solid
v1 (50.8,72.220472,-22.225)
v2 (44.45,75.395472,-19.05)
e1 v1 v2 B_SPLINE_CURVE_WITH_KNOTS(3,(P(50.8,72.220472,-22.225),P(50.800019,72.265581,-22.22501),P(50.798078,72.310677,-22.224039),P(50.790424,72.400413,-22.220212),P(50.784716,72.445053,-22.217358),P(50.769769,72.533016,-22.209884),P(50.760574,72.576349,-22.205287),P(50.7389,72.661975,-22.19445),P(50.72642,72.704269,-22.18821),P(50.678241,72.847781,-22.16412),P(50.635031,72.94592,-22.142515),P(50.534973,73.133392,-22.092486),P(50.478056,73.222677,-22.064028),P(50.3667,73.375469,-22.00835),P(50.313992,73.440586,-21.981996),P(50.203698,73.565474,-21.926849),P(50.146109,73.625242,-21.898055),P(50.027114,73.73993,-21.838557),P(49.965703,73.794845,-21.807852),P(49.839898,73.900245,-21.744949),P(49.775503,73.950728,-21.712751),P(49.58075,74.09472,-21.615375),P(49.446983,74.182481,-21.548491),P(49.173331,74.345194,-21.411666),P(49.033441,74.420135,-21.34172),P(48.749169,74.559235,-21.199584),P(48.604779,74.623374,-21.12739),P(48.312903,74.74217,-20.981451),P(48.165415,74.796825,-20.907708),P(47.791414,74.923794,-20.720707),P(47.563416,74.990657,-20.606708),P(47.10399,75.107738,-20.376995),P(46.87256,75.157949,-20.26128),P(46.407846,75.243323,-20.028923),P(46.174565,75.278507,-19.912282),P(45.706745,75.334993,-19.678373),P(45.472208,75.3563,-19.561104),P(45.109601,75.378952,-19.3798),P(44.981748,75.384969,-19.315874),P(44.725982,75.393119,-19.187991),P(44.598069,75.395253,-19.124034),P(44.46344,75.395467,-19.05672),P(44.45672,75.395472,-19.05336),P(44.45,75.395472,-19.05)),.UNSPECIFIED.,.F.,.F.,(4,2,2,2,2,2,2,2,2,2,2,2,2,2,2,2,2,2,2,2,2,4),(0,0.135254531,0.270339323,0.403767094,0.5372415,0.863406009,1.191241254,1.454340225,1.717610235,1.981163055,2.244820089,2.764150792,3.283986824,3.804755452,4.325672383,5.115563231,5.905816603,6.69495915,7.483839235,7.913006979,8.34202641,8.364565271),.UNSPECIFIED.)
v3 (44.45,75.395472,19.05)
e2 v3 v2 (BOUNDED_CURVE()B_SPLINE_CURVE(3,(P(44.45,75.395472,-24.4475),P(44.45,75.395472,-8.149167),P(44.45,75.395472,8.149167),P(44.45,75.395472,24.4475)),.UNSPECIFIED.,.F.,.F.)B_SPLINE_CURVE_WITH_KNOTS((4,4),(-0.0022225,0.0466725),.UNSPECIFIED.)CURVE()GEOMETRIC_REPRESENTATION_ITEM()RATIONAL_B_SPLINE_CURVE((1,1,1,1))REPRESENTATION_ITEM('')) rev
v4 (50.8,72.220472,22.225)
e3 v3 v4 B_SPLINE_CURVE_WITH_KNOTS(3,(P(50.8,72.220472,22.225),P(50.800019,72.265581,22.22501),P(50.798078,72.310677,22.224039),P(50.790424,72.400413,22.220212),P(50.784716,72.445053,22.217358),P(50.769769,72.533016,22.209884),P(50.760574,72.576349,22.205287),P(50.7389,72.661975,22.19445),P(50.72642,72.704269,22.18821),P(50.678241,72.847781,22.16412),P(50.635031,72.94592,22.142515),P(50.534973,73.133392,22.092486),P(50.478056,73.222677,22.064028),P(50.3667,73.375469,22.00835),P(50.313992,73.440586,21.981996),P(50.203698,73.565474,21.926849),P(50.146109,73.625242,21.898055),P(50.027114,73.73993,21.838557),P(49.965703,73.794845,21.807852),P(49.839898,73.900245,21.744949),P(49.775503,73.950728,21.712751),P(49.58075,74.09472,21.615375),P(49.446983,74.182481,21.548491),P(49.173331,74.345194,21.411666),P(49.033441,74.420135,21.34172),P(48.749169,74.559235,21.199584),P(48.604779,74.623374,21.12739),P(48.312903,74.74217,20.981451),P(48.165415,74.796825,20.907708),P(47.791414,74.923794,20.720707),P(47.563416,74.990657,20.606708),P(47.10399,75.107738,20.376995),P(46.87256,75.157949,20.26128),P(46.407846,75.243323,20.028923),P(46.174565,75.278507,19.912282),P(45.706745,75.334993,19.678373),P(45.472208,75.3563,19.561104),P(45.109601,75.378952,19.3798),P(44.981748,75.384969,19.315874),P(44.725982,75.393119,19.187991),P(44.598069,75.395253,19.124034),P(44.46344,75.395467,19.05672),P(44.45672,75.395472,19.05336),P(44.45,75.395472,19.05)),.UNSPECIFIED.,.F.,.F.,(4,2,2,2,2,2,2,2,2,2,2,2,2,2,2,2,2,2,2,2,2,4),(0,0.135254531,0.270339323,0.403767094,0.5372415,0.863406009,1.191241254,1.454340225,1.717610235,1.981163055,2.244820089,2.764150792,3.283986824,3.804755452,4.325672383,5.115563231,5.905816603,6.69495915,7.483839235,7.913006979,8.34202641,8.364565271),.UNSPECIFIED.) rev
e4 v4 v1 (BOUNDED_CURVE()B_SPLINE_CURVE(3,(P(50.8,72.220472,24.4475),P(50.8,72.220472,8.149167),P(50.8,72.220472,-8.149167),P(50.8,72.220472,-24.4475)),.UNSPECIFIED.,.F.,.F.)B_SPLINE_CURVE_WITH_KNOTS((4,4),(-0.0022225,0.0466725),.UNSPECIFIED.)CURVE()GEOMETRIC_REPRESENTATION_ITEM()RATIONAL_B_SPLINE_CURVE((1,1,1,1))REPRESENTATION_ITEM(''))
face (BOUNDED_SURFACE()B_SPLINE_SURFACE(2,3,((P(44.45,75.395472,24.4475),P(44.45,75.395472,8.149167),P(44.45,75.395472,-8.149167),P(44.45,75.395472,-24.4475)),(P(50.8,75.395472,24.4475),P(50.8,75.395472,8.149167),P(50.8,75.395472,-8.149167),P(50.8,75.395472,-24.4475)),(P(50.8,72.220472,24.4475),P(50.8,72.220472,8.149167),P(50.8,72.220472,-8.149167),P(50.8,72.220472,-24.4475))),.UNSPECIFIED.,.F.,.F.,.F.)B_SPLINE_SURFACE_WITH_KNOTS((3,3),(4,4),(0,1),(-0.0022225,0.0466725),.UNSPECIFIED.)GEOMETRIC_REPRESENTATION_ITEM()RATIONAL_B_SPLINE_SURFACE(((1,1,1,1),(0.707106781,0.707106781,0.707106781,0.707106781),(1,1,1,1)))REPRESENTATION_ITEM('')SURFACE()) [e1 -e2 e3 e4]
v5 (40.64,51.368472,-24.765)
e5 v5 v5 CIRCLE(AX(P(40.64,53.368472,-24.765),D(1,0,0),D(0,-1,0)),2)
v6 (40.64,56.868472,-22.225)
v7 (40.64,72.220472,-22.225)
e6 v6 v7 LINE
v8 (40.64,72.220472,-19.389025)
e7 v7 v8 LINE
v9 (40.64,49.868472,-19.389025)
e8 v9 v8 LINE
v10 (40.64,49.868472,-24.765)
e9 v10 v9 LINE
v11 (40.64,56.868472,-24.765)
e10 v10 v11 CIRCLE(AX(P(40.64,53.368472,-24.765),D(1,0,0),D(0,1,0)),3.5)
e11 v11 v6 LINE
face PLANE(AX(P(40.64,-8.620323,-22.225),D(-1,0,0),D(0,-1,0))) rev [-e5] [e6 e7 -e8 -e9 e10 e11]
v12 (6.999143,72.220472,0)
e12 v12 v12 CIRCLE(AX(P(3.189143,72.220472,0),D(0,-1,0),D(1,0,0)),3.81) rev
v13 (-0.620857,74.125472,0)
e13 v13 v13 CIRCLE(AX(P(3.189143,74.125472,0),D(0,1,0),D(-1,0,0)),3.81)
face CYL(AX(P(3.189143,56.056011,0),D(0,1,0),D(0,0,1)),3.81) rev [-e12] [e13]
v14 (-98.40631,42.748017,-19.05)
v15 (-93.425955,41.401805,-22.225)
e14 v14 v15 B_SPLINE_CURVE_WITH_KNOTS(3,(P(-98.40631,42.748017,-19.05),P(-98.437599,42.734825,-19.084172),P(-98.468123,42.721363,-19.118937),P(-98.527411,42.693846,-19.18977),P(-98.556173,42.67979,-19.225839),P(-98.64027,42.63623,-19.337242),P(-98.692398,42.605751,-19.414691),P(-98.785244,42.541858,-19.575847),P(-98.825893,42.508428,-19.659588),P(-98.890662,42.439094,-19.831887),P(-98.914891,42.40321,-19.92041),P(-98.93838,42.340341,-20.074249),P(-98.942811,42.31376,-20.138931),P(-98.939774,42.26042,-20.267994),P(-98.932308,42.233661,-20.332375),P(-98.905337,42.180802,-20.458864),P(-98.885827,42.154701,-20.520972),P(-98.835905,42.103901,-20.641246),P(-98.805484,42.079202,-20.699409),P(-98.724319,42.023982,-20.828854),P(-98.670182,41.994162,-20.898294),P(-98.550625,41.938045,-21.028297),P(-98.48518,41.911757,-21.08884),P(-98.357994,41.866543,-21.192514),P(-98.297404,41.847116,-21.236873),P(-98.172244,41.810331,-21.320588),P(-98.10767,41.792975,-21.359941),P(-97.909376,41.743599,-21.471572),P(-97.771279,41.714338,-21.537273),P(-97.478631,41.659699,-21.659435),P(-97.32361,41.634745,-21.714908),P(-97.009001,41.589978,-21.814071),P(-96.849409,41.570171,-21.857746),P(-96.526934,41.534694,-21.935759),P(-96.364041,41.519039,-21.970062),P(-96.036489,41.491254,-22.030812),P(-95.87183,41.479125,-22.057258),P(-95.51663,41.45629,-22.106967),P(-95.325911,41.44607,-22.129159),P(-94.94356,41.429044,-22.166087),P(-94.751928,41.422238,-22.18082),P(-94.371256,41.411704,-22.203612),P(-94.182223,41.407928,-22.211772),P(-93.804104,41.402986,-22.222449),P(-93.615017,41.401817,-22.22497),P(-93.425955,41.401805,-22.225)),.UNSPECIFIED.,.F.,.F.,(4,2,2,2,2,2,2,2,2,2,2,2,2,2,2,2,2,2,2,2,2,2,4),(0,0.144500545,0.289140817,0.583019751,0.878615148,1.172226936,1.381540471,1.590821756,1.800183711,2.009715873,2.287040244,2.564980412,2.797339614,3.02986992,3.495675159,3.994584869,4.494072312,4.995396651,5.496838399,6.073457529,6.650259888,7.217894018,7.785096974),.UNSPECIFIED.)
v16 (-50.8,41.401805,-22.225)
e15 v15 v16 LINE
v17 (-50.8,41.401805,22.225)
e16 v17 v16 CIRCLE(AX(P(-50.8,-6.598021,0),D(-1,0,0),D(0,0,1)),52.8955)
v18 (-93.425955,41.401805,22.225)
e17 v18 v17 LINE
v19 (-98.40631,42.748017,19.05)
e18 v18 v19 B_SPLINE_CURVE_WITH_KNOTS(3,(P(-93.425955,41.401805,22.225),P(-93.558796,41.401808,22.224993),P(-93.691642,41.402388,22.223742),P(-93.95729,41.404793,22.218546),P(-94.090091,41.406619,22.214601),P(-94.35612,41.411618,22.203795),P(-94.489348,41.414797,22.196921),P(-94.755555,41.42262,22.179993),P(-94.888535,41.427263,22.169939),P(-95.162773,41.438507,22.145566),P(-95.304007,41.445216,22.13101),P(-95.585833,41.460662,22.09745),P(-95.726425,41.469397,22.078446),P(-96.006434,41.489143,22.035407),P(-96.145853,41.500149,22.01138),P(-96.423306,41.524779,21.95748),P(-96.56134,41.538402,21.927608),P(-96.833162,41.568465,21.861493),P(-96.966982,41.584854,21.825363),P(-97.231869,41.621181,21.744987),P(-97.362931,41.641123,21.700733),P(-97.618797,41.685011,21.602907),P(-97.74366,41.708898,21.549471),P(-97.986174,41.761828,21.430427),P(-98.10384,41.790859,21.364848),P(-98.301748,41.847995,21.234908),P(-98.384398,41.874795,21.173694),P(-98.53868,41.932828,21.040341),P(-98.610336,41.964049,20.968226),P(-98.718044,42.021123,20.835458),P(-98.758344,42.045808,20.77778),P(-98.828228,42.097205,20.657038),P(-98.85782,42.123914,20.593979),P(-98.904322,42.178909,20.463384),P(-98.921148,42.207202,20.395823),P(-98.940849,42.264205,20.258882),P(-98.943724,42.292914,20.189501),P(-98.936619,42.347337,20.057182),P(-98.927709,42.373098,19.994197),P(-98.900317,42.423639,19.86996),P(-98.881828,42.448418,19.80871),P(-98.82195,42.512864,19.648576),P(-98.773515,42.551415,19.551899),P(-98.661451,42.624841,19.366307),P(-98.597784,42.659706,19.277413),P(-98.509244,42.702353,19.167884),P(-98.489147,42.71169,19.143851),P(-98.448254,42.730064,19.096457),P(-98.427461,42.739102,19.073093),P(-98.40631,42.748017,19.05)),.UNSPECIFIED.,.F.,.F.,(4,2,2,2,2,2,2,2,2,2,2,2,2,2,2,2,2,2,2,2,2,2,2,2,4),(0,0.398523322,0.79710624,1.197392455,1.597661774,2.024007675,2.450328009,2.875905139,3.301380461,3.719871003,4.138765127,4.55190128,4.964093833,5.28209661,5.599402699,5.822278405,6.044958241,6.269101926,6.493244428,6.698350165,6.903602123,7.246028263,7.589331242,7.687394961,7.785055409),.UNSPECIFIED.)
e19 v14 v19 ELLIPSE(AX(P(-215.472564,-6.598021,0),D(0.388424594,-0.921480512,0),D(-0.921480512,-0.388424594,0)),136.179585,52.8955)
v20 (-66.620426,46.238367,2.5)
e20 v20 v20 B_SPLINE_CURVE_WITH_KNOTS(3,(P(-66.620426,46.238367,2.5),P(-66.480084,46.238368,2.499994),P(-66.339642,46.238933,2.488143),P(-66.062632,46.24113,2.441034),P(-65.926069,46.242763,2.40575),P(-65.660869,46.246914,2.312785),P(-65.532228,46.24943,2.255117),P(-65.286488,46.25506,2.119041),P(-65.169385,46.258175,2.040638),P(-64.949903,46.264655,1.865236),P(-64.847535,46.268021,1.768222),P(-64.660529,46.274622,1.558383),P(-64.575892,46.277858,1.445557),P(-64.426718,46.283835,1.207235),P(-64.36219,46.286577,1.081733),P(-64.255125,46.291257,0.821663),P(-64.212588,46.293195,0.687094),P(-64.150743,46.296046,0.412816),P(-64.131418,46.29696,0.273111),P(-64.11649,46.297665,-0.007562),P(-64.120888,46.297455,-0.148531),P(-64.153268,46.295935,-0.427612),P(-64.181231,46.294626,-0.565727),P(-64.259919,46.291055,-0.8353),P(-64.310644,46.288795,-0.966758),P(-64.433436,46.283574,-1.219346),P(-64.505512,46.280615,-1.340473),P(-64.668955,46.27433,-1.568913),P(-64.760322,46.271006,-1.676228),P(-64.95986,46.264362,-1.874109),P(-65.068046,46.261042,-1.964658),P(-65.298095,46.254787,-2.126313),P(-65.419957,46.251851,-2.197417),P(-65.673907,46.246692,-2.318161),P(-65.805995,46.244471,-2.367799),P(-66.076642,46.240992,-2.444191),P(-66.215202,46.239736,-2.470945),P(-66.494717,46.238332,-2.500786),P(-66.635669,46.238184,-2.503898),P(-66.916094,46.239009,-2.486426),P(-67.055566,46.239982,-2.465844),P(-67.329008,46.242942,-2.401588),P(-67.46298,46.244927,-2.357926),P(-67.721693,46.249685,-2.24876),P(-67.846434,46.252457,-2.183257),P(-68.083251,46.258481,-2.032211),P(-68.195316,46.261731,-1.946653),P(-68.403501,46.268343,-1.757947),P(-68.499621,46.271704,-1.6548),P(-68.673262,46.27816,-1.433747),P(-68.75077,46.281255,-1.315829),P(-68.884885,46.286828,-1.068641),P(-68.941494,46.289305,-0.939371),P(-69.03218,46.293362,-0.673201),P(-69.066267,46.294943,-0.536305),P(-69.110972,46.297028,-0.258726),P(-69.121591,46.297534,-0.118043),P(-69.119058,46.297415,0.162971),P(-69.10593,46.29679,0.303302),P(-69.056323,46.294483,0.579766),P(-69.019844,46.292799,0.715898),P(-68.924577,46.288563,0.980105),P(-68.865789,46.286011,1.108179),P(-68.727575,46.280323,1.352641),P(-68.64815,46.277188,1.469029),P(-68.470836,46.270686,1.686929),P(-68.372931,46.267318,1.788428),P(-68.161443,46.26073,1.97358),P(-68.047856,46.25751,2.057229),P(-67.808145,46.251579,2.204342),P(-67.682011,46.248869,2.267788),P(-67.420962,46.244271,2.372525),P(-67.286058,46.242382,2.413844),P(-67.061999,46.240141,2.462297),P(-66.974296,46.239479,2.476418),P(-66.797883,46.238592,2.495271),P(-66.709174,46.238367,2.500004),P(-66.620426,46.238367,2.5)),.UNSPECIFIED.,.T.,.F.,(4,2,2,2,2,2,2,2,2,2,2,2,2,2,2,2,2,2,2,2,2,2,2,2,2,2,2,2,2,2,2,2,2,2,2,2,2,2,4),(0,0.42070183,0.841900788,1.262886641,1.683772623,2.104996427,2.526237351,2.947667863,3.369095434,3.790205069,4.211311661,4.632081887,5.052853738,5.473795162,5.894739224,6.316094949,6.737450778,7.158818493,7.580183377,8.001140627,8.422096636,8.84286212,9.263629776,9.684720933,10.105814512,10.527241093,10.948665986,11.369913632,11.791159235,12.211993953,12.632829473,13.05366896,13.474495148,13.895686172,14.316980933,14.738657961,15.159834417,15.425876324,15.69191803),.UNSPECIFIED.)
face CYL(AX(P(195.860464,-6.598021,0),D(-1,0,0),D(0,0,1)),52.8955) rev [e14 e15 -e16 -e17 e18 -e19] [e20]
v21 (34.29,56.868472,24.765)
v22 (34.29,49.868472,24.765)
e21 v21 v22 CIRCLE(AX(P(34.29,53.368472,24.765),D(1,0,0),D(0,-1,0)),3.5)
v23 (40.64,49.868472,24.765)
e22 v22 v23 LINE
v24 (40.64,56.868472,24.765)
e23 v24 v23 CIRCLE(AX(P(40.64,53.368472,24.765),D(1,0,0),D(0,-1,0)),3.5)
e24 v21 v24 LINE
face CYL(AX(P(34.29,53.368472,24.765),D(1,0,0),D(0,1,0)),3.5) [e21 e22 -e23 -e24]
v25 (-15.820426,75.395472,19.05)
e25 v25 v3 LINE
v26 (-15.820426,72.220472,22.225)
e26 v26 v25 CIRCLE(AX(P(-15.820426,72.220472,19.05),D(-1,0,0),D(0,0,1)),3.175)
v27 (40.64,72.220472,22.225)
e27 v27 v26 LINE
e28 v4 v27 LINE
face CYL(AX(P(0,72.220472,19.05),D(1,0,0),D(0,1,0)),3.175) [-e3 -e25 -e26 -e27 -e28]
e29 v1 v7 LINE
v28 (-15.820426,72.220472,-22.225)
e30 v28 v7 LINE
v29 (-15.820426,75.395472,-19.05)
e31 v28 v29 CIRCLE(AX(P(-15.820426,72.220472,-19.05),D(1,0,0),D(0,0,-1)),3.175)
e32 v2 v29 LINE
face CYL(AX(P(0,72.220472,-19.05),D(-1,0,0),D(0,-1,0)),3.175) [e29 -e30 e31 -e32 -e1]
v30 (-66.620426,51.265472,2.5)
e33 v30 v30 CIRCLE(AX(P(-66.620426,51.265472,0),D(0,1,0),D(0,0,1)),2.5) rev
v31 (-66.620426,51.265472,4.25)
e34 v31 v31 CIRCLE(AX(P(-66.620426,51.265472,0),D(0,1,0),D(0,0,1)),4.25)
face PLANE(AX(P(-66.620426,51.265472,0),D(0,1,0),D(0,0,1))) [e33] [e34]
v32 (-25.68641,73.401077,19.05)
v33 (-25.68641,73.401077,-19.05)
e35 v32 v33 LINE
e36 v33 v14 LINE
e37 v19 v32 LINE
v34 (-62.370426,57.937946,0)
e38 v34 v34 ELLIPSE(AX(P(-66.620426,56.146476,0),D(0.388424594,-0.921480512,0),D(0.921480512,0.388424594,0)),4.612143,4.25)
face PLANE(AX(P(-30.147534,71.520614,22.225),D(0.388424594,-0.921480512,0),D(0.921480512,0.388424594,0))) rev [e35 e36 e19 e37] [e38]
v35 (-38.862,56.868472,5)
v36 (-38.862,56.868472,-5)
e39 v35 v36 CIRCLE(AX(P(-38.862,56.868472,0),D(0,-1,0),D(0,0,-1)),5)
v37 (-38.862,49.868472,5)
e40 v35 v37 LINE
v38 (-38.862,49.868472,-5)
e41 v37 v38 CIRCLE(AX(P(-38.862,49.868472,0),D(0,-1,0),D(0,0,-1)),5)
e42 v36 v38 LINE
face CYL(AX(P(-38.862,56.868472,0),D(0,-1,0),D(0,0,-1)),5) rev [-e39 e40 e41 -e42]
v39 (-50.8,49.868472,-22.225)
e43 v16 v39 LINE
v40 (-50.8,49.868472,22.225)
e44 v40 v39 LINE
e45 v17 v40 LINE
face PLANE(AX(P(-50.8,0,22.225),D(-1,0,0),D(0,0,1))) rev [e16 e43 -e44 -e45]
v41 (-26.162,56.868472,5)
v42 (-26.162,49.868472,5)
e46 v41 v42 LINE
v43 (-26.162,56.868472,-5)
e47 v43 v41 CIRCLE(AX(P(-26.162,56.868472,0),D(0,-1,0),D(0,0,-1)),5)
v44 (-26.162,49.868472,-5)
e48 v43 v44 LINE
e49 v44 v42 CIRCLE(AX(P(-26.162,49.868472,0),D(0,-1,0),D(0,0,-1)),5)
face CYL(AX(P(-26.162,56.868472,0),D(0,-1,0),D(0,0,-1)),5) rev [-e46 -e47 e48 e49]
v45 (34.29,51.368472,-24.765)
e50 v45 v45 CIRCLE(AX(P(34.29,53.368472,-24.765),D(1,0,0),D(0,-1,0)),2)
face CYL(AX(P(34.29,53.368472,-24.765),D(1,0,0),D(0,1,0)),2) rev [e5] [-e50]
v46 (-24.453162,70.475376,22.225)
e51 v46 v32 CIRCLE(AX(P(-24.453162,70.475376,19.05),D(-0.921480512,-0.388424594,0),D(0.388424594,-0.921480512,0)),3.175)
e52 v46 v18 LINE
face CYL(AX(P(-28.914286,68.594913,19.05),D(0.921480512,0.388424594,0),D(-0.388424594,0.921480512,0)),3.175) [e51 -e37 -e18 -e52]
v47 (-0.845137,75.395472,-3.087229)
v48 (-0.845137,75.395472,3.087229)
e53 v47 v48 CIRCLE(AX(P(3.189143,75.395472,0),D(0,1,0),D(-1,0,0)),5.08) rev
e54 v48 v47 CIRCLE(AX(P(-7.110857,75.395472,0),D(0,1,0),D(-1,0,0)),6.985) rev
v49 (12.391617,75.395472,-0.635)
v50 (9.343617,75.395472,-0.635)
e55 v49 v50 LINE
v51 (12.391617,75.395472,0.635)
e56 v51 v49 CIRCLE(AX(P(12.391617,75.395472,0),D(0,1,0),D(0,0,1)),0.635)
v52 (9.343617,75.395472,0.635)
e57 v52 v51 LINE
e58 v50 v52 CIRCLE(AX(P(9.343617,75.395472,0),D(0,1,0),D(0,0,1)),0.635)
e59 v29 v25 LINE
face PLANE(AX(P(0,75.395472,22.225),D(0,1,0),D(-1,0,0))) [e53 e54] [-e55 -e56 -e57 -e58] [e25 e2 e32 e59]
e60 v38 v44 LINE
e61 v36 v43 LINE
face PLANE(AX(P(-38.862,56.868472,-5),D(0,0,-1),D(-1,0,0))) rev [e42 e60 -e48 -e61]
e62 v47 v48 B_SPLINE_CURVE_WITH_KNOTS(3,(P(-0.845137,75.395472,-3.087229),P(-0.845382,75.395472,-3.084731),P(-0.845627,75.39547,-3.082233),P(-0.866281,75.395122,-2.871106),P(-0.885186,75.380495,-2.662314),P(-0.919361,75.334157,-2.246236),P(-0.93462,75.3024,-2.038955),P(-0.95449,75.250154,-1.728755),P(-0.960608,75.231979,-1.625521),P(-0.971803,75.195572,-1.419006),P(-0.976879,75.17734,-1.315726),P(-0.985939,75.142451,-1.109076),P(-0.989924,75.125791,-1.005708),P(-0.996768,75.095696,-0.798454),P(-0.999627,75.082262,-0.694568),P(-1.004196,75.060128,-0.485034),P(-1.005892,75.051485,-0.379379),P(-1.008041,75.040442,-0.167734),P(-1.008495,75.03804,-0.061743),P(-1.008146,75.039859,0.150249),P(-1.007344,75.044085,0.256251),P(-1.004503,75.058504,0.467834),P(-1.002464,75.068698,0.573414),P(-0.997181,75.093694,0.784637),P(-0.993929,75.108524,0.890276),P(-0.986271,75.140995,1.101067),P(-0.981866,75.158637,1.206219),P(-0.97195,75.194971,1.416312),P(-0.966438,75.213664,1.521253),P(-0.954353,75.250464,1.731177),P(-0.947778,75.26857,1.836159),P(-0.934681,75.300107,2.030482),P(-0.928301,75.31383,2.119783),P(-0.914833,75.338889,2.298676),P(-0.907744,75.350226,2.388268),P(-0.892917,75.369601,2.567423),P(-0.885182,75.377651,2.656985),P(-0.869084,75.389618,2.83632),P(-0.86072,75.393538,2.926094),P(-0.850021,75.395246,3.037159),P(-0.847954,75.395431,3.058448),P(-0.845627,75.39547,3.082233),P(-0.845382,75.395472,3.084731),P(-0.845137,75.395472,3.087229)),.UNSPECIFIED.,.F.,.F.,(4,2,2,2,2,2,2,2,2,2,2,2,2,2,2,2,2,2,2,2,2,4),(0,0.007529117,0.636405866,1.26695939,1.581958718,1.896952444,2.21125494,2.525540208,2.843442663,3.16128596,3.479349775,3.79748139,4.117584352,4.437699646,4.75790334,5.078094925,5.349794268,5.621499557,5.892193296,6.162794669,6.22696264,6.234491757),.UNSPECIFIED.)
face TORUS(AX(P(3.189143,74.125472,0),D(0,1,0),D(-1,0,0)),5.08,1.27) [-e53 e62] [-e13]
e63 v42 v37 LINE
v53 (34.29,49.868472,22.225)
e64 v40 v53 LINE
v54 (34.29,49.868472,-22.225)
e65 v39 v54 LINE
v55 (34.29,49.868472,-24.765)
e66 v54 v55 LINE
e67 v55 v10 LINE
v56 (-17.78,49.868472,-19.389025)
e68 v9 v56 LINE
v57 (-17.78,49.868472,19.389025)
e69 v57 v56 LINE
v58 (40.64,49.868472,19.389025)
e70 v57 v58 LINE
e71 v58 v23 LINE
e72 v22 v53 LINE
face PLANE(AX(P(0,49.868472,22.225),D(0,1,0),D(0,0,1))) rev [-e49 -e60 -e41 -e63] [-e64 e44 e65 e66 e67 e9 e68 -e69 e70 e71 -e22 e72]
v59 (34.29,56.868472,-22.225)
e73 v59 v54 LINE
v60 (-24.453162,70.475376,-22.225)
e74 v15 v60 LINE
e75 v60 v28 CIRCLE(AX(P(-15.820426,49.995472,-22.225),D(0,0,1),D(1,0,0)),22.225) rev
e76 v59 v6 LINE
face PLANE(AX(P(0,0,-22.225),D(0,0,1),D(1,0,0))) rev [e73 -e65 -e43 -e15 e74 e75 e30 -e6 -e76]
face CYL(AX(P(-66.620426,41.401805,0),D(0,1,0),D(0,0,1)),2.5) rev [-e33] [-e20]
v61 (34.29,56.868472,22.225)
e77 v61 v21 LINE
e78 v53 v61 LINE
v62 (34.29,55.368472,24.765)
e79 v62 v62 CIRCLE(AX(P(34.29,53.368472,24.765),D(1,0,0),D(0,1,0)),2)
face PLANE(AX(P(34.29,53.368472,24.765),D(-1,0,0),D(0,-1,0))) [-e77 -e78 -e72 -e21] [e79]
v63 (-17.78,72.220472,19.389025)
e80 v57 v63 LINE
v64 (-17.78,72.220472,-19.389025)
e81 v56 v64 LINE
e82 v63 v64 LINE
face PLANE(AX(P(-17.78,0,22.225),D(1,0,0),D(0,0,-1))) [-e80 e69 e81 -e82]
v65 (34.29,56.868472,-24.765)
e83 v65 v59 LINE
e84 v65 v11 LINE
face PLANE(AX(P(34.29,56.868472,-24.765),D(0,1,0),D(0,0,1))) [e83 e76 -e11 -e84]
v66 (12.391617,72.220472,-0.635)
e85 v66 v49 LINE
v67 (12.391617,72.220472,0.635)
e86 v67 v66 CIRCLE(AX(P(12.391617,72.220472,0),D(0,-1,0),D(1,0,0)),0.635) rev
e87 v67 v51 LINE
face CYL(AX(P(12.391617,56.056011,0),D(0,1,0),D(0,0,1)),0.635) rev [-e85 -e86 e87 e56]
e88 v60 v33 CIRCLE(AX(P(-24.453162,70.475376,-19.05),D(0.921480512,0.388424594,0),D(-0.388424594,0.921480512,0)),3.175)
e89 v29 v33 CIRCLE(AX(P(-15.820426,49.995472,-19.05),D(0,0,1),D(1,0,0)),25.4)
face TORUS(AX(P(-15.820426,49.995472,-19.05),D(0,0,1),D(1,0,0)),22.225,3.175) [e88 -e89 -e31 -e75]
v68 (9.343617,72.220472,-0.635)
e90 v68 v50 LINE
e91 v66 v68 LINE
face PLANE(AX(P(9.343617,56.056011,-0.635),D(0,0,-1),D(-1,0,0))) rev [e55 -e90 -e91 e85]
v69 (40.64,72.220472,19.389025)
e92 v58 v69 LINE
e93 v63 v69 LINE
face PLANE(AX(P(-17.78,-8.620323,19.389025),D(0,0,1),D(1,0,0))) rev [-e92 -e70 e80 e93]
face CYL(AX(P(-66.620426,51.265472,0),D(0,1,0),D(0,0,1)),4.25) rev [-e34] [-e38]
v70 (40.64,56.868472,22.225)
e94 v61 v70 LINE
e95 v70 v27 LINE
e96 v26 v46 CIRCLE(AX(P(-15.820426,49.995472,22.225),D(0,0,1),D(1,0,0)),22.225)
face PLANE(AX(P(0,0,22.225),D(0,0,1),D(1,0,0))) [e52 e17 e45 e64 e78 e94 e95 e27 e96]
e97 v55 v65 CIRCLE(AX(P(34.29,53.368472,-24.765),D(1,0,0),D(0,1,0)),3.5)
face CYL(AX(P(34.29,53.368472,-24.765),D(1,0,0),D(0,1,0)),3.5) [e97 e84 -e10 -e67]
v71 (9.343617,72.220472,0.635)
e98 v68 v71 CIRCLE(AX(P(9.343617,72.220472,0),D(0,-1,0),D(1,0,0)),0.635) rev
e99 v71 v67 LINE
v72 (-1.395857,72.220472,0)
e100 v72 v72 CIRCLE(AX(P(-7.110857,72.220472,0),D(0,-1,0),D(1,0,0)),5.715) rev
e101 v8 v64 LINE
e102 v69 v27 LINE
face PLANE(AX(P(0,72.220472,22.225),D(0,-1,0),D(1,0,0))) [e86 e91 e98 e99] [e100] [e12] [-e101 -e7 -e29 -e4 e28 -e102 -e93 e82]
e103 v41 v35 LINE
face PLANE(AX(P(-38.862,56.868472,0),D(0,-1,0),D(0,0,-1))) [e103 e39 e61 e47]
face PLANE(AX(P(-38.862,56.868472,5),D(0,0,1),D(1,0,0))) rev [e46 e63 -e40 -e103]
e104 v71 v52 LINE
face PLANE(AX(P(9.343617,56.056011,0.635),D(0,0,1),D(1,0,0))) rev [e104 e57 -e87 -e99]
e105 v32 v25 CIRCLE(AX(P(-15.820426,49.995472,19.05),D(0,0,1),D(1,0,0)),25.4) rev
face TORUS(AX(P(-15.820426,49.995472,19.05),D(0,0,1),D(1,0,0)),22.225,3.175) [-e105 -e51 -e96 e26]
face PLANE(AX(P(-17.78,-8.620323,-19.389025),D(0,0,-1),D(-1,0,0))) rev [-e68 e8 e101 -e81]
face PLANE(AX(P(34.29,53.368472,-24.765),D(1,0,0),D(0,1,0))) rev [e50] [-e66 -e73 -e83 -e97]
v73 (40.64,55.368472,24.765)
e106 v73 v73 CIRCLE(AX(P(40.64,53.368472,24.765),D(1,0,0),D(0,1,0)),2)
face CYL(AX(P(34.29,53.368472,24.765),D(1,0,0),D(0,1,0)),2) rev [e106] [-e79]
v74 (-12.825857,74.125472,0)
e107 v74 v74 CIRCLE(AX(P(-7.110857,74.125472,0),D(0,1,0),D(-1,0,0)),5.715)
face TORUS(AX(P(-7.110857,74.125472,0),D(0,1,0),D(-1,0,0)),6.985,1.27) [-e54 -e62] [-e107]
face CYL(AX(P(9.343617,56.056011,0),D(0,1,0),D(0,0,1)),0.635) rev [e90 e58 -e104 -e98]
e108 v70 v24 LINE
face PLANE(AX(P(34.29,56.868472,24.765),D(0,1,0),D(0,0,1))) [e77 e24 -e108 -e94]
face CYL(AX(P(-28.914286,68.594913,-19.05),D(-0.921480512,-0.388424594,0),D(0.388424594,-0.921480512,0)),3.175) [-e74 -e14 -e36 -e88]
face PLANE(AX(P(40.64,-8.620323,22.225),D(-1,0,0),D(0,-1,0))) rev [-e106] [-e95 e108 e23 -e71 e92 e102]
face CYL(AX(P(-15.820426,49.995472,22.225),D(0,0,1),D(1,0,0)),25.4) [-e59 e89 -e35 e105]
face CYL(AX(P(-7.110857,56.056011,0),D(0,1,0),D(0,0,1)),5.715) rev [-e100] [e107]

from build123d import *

# Parameters (mm, degrees)
BOSS_EXTRUDE1_DEPTH     = 22.225
FILLET1_R               = 25.4
CUT_EXTRUDE1_DEPTH      = 129.456170755
CUT_EXTRUDE1_DEPTH_BACK = 129.456170755
SKETCH2_W               = 58.42
SKETCH2_H               = 2.835975014
BOSS_EXTRUDE2_DEPTH     = 22.352
FILLET2_SIZE            = 3.175
FILLET2_SIZE_2          = 6.35
SKETCH4_R               = 5.715
SKETCH4_R_2             = 3.81
CUT_EXTRUDE2_DEPTH      = 3.175
FILLET4_R               = 1.27
SKETCH5_R               = 2.5
CUT_EXTRUDE3_DEPTH      = 110.417000644
CUT_EXTRUDE5_DEPTH      = 7
SKETCH8_R               = 2
BOSS_EXTRUDE3_DEPTH     = 6.35
FILLET3_R               = 3.175
SKETCH6_R               = 4.25
CUT_EXTRUDE8_DEPTH      = 24.13


with BuildPart() as part:
    # Sketch1 → Boss-Extrude1 (new, symmetric)
    with BuildSketch(Plane.XY):
        Polygon((-17.78, 72.220471881), (-17.78, 49.868471881), (-50.8, 49.868471881), (-50.8, 41.401805214), (-101.6, 41.401805214), (-20.955, 75.395471881), (50.8, 75.395471881), (50.8, 72.220471881), align=None)
    extrude(amount=BOSS_EXTRUDE1_DEPTH, both=True)

    # Fillet1
    fillet1_edges = [part.edges().sort_by_distance(p)[0] for p in [
        (-20.955, 75.395471881, 0),
    ]]
    fillet(fillet1_edges, radius=FILLET1_R)

    # Sketch3 → Cut-Extrude1 (cut, two sides: drawn at the far end of the back side and taken through both)
    with BuildSketch(Plane(origin=(-50.8, 0, 0), x_dir=(0, 0, -1), z_dir=(1, 0, 0)).offset(-CUT_EXTRUDE1_DEPTH_BACK)):
        with BuildLine():
            Line((-132.858425435, -9.823961327), (-22.225, 41.401805214))
            ThreePointArc((-22.225, 41.401805214), (0, 46.297479222), (22.225, 41.401805214))
            Line((22.225, 41.401805214), (132.858425435, -9.823961327))
            Line((132.858425435, -9.823961327), (132.858425435, -253.658610064))
            Line((132.858425435, -253.658610064), (-132.858425435, -253.658610064))
            Line((-132.858425435, -253.658610064), (-132.858425435, -9.823961327))
        make_face()
    extrude(amount=CUT_EXTRUDE1_DEPTH + CUT_EXTRUDE1_DEPTH_BACK, mode=Mode.SUBTRACT)

    # Sketch2 → Boss-Extrude2 (add)
    with BuildSketch(Plane.XZ.offset(-72.220471881)):
        with Locations((11.43, 20.807012493)):
            Rectangle(SKETCH2_W, SKETCH2_H)
        with Locations((11.43, -20.807012493)):
            Rectangle(SKETCH2_W, SKETCH2_H)
    extrude(amount=BOSS_EXTRUDE2_DEPTH)

    # Fillet2
    # an asymmetric fillet: 6.35, 3.175 mm, written as the material it takes off along each edge
    with BuildSketch(Plane(origin=(50.8, 75.395471881, -38.1), x_dir=(0, -1, 0), z_dir=(0, 0, 1))) as fillet2_piece_1:
        with BuildLine():
            Bezier((FILLET2_SIZE, 0), (0, 0), (0, -FILLET2_SIZE_2), weights=[1, 0.707106781, 1])
            Line((0, -FILLET2_SIZE_2), (0, 0))
            Line((0, 0), (FILLET2_SIZE, 0))
        make_face()
    extrude(amount=76.2, mode=Mode.SUBTRACT)

    # Sketch4 → Cut-Extrude2 (cut)
    with BuildSketch(Plane(origin=(0, 75.395471881, 0), x_dir=(1, 0, 0), z_dir=(0, 1, 0))):
        with Locations(Location((-7.110857048, 0, 0), (0, 0, 270))):
            Circle(SKETCH4_R)
        with Locations(Location((3.189142952, 0, 0), (0, 0, 270))):
            Circle(SKETCH4_R_2)
        with BuildLine():
            Line((9.34361728, 0.635), (12.39161728, 0.635))
            ThreePointArc((12.39161728, 0.635), (13.02661728, 0), (12.39161728, -0.635))
            Line((12.39161728, -0.635), (9.34361728, -0.635))
            ThreePointArc((9.34361728, -0.635), (8.70861728, 0), (9.34361728, 0.635))
        make_face()
    extrude(amount=-CUT_EXTRUDE2_DEPTH, mode=Mode.SUBTRACT)

    # Fillet4
    # the kernel refuses this fillet: 1.27 mm, written as the material it takes off along each edge
    with BuildSketch(Plane(origin=(-7.110857048, 75.395471881, 0), x_dir=(0, 0, 1), z_dir=(-1, 0, 0))) as fillet4_piece_1:
        with BuildLine():
            CenterArc((5.715 + FILLET4_R, -FILLET4_R), FILLET4_R, 90, 90)
            Line((5.715, -FILLET4_R), (5.715, 0))
            Line((5.715, 0), (5.715 + FILLET4_R, 0))
        make_face()
    revolve(axis=Axis((-7.110857048, 75.395471881, 0), (0, 1, 0)), mode=Mode.SUBTRACT)
    with BuildSketch(Plane(origin=(3.189142952, 75.395471881, 0), x_dir=(0, 0, 1), z_dir=(-1, 0, 0))) as fillet4_piece_2:
        with BuildLine():
            CenterArc((3.81 + FILLET4_R, -FILLET4_R), FILLET4_R, 90, 90)
            Line((3.81, -FILLET4_R), (3.81, 0))
            Line((3.81, 0), (3.81 + FILLET4_R, 0))
        make_face()
    revolve(axis=Axis((3.189142952, 75.395471881, 0), (0, 1, 0)), mode=Mode.SUBTRACT)

    # Sketch5 → Cut-Extrude3 (cut, through all)
    with BuildSketch(Plane(origin=(0, 75.395471881, 0), x_dir=(1, 0, 0), z_dir=(0, 1, 0))):
        with Locations(Location((-66.620425581, 0, 0), (0, 0, 270))):
            Circle(SKETCH5_R)
    extrude(amount=-CUT_EXTRUDE3_DEPTH, mode=Mode.SUBTRACT)

    # Sketch7 → Cut-Extrude5 (cut)
    with BuildSketch(Plane.XZ.offset(-49.868471881)):
        with BuildLine():
            Line((-38.862, 5), (-26.162, 5))
            ThreePointArc((-26.162, 5), (-21.162, 0), (-26.162, -5))
            Line((-26.162, -5), (-38.862, -5))
            ThreePointArc((-38.862, -5), (-43.862, 0), (-38.862, 5))
        make_face()
    extrude(amount=-CUT_EXTRUDE5_DEPTH, mode=Mode.SUBTRACT)

    # Sketch8 → Boss-Extrude3 (add)
    # profile 1 of 2: a face of its own
    with BuildSketch(Plane(origin=(40.64, 0, 0), x_dir=(0, 0, -1), z_dir=(1, 0, 0))):
        with BuildLine():
            Line((-22.225, 49.868471881), (-24.765, 49.868471881))
            ThreePointArc((-24.765, 49.868471881), (-28.265, 53.368471881), (-24.765, 56.868471881))
            Line((-24.765, 56.868471881), (-22.225, 56.868471881))
            Line((-22.225, 56.868471881), (-22.225, 49.868471881))
        make_face()
        with Locations(Location((-24.765, 53.368471881, 0), (0, 0, 90))):
            Circle(SKETCH8_R, mode=Mode.SUBTRACT)
    # profile 2 of 2: a face of its own
    with BuildSketch(Plane(origin=(40.64, 0, 0), x_dir=(0, 0, -1), z_dir=(1, 0, 0))):
        with BuildLine():
            Line((22.225, 56.868471881), (22.225, 49.868471881))
            Line((22.225, 49.868471881), (24.765, 49.868471881))
            ThreePointArc((24.765, 49.868471881), (28.265, 53.368471881), (24.765, 56.868471881))
            Line((24.765, 56.868471881), (22.225, 56.868471881))
        make_face()
        with Locations(Location((24.765, 53.368471881, 0), (0, 0, 270))):
            Circle(SKETCH8_R, mode=Mode.SUBTRACT)
    extrude(amount=-BOSS_EXTRUDE3_DEPTH)

    # Fillet3
    # the kernel refuses this fillet: 3.175 mm, written as the material it takes off along each edge
    with BuildSketch(Plane(origin=(-15.820425581, 75.395471881, -22.225), x_dir=(0, -1, 0), z_dir=(1, 0, 0))) as fillet3_piece_1:
        with BuildLine():
            CenterArc((FILLET3_R, -FILLET3_R), FILLET3_R, 90, 90)
            Line((0, -FILLET3_R), (0, 0))
            Line((0, 0), (FILLET3_R, 0))
        make_face()
    extrude(amount=68.207925581, mode=Mode.SUBTRACT)
    with BuildSketch(Plane(origin=(-15.820425581, 49.995471881, -22.225), x_dir=(0, 1, 0), z_dir=(1, 0, 0))) as fillet3_piece_2:
        with BuildLine():
            CenterArc((25.4 - FILLET3_R, FILLET3_R), FILLET3_R, 270, 90)
            Line((25.4 - FILLET3_R, 0), (25.4, 0))
            Line((25.4, 0), (25.4, FILLET3_R))
        make_face()
    revolve(axis=Axis((-15.820425581, 49.995471881, -22.225), (0, 0, 1)), revolution_arc=22.856508496, mode=Mode.SUBTRACT)
    with BuildSketch(Plane(origin=(-108.914251568, 38.318685, -22.225), x_dir=(0.38842459395806633, -0.921480512440991, 0), z_dir=(0.921480512440991, 0.38842459395806633, 0))) as fillet3_piece_3:
        with BuildLine():
            CenterArc((FILLET3_R, -FILLET3_R), FILLET3_R, 90, 90)
            Line((0, -FILLET3_R), (0, 0))
            Line((0, 0), (FILLET3_R, 0))
        make_face()
    extrude(amount=90.319697679, mode=Mode.SUBTRACT)
    with BuildSketch(Plane(origin=(-108.914251568, 38.318685, 22.225), x_dir=(0.38842459395806633, -0.921480512440991, 0), z_dir=(0.921480512440991, 0.38842459395806633, 0))) as fillet3_piece_4:
        with BuildLine():
            CenterArc((FILLET3_R, FILLET3_R), FILLET3_R, 180, 90)
            Line((0, FILLET3_R), (0, 0))
            Line((0, 0), (FILLET3_R, 0))
        make_face()
    extrude(amount=90.319697679, mode=Mode.SUBTRACT)
    with BuildSketch(Plane(origin=(-15.820425581, 49.995471881, 22.225), x_dir=(0, 1, 0), z_dir=(1, 0, 0))) as fillet3_piece_5:
        with BuildLine():
            CenterArc((25.4 - FILLET3_R, -FILLET3_R), FILLET3_R, 0, 90)
            Line((25.4, -FILLET3_R), (25.4, 0))
            Line((25.4, 0), (25.4 - FILLET3_R, 0))
        make_face()
    revolve(axis=Axis((-15.820425581, 49.995471881, 22.225), (0, 0, 1)), revolution_arc=22.856508496, mode=Mode.SUBTRACT)
    with BuildSketch(Plane(origin=(-15.820425581, 75.395471881, 22.225), x_dir=(0, -1, 0), z_dir=(1, 0, 0))) as fillet3_piece_6:
        with BuildLine():
            CenterArc((FILLET3_R, FILLET3_R), FILLET3_R, 180, 90)
            Line((0, FILLET3_R), (0, 0))
            Line((0, 0), (FILLET3_R, 0))
        make_face()
    extrude(amount=68.207925581, mode=Mode.SUBTRACT)

    # Sketch6 → Cut-Extrude8 (cut)
    with BuildSketch(Plane(origin=(0, 75.395471881, 0), x_dir=(1, 0, 0), z_dir=(0, 1, 0))):
        with Locations(Location((-66.620425581, 0, 0), (0, 0, 270))):
            Circle(SKETCH6_R)
    extrude(amount=-CUT_EXTRUDE8_DEPTH, mode=Mode.SUBTRACT)


solid = part.part
